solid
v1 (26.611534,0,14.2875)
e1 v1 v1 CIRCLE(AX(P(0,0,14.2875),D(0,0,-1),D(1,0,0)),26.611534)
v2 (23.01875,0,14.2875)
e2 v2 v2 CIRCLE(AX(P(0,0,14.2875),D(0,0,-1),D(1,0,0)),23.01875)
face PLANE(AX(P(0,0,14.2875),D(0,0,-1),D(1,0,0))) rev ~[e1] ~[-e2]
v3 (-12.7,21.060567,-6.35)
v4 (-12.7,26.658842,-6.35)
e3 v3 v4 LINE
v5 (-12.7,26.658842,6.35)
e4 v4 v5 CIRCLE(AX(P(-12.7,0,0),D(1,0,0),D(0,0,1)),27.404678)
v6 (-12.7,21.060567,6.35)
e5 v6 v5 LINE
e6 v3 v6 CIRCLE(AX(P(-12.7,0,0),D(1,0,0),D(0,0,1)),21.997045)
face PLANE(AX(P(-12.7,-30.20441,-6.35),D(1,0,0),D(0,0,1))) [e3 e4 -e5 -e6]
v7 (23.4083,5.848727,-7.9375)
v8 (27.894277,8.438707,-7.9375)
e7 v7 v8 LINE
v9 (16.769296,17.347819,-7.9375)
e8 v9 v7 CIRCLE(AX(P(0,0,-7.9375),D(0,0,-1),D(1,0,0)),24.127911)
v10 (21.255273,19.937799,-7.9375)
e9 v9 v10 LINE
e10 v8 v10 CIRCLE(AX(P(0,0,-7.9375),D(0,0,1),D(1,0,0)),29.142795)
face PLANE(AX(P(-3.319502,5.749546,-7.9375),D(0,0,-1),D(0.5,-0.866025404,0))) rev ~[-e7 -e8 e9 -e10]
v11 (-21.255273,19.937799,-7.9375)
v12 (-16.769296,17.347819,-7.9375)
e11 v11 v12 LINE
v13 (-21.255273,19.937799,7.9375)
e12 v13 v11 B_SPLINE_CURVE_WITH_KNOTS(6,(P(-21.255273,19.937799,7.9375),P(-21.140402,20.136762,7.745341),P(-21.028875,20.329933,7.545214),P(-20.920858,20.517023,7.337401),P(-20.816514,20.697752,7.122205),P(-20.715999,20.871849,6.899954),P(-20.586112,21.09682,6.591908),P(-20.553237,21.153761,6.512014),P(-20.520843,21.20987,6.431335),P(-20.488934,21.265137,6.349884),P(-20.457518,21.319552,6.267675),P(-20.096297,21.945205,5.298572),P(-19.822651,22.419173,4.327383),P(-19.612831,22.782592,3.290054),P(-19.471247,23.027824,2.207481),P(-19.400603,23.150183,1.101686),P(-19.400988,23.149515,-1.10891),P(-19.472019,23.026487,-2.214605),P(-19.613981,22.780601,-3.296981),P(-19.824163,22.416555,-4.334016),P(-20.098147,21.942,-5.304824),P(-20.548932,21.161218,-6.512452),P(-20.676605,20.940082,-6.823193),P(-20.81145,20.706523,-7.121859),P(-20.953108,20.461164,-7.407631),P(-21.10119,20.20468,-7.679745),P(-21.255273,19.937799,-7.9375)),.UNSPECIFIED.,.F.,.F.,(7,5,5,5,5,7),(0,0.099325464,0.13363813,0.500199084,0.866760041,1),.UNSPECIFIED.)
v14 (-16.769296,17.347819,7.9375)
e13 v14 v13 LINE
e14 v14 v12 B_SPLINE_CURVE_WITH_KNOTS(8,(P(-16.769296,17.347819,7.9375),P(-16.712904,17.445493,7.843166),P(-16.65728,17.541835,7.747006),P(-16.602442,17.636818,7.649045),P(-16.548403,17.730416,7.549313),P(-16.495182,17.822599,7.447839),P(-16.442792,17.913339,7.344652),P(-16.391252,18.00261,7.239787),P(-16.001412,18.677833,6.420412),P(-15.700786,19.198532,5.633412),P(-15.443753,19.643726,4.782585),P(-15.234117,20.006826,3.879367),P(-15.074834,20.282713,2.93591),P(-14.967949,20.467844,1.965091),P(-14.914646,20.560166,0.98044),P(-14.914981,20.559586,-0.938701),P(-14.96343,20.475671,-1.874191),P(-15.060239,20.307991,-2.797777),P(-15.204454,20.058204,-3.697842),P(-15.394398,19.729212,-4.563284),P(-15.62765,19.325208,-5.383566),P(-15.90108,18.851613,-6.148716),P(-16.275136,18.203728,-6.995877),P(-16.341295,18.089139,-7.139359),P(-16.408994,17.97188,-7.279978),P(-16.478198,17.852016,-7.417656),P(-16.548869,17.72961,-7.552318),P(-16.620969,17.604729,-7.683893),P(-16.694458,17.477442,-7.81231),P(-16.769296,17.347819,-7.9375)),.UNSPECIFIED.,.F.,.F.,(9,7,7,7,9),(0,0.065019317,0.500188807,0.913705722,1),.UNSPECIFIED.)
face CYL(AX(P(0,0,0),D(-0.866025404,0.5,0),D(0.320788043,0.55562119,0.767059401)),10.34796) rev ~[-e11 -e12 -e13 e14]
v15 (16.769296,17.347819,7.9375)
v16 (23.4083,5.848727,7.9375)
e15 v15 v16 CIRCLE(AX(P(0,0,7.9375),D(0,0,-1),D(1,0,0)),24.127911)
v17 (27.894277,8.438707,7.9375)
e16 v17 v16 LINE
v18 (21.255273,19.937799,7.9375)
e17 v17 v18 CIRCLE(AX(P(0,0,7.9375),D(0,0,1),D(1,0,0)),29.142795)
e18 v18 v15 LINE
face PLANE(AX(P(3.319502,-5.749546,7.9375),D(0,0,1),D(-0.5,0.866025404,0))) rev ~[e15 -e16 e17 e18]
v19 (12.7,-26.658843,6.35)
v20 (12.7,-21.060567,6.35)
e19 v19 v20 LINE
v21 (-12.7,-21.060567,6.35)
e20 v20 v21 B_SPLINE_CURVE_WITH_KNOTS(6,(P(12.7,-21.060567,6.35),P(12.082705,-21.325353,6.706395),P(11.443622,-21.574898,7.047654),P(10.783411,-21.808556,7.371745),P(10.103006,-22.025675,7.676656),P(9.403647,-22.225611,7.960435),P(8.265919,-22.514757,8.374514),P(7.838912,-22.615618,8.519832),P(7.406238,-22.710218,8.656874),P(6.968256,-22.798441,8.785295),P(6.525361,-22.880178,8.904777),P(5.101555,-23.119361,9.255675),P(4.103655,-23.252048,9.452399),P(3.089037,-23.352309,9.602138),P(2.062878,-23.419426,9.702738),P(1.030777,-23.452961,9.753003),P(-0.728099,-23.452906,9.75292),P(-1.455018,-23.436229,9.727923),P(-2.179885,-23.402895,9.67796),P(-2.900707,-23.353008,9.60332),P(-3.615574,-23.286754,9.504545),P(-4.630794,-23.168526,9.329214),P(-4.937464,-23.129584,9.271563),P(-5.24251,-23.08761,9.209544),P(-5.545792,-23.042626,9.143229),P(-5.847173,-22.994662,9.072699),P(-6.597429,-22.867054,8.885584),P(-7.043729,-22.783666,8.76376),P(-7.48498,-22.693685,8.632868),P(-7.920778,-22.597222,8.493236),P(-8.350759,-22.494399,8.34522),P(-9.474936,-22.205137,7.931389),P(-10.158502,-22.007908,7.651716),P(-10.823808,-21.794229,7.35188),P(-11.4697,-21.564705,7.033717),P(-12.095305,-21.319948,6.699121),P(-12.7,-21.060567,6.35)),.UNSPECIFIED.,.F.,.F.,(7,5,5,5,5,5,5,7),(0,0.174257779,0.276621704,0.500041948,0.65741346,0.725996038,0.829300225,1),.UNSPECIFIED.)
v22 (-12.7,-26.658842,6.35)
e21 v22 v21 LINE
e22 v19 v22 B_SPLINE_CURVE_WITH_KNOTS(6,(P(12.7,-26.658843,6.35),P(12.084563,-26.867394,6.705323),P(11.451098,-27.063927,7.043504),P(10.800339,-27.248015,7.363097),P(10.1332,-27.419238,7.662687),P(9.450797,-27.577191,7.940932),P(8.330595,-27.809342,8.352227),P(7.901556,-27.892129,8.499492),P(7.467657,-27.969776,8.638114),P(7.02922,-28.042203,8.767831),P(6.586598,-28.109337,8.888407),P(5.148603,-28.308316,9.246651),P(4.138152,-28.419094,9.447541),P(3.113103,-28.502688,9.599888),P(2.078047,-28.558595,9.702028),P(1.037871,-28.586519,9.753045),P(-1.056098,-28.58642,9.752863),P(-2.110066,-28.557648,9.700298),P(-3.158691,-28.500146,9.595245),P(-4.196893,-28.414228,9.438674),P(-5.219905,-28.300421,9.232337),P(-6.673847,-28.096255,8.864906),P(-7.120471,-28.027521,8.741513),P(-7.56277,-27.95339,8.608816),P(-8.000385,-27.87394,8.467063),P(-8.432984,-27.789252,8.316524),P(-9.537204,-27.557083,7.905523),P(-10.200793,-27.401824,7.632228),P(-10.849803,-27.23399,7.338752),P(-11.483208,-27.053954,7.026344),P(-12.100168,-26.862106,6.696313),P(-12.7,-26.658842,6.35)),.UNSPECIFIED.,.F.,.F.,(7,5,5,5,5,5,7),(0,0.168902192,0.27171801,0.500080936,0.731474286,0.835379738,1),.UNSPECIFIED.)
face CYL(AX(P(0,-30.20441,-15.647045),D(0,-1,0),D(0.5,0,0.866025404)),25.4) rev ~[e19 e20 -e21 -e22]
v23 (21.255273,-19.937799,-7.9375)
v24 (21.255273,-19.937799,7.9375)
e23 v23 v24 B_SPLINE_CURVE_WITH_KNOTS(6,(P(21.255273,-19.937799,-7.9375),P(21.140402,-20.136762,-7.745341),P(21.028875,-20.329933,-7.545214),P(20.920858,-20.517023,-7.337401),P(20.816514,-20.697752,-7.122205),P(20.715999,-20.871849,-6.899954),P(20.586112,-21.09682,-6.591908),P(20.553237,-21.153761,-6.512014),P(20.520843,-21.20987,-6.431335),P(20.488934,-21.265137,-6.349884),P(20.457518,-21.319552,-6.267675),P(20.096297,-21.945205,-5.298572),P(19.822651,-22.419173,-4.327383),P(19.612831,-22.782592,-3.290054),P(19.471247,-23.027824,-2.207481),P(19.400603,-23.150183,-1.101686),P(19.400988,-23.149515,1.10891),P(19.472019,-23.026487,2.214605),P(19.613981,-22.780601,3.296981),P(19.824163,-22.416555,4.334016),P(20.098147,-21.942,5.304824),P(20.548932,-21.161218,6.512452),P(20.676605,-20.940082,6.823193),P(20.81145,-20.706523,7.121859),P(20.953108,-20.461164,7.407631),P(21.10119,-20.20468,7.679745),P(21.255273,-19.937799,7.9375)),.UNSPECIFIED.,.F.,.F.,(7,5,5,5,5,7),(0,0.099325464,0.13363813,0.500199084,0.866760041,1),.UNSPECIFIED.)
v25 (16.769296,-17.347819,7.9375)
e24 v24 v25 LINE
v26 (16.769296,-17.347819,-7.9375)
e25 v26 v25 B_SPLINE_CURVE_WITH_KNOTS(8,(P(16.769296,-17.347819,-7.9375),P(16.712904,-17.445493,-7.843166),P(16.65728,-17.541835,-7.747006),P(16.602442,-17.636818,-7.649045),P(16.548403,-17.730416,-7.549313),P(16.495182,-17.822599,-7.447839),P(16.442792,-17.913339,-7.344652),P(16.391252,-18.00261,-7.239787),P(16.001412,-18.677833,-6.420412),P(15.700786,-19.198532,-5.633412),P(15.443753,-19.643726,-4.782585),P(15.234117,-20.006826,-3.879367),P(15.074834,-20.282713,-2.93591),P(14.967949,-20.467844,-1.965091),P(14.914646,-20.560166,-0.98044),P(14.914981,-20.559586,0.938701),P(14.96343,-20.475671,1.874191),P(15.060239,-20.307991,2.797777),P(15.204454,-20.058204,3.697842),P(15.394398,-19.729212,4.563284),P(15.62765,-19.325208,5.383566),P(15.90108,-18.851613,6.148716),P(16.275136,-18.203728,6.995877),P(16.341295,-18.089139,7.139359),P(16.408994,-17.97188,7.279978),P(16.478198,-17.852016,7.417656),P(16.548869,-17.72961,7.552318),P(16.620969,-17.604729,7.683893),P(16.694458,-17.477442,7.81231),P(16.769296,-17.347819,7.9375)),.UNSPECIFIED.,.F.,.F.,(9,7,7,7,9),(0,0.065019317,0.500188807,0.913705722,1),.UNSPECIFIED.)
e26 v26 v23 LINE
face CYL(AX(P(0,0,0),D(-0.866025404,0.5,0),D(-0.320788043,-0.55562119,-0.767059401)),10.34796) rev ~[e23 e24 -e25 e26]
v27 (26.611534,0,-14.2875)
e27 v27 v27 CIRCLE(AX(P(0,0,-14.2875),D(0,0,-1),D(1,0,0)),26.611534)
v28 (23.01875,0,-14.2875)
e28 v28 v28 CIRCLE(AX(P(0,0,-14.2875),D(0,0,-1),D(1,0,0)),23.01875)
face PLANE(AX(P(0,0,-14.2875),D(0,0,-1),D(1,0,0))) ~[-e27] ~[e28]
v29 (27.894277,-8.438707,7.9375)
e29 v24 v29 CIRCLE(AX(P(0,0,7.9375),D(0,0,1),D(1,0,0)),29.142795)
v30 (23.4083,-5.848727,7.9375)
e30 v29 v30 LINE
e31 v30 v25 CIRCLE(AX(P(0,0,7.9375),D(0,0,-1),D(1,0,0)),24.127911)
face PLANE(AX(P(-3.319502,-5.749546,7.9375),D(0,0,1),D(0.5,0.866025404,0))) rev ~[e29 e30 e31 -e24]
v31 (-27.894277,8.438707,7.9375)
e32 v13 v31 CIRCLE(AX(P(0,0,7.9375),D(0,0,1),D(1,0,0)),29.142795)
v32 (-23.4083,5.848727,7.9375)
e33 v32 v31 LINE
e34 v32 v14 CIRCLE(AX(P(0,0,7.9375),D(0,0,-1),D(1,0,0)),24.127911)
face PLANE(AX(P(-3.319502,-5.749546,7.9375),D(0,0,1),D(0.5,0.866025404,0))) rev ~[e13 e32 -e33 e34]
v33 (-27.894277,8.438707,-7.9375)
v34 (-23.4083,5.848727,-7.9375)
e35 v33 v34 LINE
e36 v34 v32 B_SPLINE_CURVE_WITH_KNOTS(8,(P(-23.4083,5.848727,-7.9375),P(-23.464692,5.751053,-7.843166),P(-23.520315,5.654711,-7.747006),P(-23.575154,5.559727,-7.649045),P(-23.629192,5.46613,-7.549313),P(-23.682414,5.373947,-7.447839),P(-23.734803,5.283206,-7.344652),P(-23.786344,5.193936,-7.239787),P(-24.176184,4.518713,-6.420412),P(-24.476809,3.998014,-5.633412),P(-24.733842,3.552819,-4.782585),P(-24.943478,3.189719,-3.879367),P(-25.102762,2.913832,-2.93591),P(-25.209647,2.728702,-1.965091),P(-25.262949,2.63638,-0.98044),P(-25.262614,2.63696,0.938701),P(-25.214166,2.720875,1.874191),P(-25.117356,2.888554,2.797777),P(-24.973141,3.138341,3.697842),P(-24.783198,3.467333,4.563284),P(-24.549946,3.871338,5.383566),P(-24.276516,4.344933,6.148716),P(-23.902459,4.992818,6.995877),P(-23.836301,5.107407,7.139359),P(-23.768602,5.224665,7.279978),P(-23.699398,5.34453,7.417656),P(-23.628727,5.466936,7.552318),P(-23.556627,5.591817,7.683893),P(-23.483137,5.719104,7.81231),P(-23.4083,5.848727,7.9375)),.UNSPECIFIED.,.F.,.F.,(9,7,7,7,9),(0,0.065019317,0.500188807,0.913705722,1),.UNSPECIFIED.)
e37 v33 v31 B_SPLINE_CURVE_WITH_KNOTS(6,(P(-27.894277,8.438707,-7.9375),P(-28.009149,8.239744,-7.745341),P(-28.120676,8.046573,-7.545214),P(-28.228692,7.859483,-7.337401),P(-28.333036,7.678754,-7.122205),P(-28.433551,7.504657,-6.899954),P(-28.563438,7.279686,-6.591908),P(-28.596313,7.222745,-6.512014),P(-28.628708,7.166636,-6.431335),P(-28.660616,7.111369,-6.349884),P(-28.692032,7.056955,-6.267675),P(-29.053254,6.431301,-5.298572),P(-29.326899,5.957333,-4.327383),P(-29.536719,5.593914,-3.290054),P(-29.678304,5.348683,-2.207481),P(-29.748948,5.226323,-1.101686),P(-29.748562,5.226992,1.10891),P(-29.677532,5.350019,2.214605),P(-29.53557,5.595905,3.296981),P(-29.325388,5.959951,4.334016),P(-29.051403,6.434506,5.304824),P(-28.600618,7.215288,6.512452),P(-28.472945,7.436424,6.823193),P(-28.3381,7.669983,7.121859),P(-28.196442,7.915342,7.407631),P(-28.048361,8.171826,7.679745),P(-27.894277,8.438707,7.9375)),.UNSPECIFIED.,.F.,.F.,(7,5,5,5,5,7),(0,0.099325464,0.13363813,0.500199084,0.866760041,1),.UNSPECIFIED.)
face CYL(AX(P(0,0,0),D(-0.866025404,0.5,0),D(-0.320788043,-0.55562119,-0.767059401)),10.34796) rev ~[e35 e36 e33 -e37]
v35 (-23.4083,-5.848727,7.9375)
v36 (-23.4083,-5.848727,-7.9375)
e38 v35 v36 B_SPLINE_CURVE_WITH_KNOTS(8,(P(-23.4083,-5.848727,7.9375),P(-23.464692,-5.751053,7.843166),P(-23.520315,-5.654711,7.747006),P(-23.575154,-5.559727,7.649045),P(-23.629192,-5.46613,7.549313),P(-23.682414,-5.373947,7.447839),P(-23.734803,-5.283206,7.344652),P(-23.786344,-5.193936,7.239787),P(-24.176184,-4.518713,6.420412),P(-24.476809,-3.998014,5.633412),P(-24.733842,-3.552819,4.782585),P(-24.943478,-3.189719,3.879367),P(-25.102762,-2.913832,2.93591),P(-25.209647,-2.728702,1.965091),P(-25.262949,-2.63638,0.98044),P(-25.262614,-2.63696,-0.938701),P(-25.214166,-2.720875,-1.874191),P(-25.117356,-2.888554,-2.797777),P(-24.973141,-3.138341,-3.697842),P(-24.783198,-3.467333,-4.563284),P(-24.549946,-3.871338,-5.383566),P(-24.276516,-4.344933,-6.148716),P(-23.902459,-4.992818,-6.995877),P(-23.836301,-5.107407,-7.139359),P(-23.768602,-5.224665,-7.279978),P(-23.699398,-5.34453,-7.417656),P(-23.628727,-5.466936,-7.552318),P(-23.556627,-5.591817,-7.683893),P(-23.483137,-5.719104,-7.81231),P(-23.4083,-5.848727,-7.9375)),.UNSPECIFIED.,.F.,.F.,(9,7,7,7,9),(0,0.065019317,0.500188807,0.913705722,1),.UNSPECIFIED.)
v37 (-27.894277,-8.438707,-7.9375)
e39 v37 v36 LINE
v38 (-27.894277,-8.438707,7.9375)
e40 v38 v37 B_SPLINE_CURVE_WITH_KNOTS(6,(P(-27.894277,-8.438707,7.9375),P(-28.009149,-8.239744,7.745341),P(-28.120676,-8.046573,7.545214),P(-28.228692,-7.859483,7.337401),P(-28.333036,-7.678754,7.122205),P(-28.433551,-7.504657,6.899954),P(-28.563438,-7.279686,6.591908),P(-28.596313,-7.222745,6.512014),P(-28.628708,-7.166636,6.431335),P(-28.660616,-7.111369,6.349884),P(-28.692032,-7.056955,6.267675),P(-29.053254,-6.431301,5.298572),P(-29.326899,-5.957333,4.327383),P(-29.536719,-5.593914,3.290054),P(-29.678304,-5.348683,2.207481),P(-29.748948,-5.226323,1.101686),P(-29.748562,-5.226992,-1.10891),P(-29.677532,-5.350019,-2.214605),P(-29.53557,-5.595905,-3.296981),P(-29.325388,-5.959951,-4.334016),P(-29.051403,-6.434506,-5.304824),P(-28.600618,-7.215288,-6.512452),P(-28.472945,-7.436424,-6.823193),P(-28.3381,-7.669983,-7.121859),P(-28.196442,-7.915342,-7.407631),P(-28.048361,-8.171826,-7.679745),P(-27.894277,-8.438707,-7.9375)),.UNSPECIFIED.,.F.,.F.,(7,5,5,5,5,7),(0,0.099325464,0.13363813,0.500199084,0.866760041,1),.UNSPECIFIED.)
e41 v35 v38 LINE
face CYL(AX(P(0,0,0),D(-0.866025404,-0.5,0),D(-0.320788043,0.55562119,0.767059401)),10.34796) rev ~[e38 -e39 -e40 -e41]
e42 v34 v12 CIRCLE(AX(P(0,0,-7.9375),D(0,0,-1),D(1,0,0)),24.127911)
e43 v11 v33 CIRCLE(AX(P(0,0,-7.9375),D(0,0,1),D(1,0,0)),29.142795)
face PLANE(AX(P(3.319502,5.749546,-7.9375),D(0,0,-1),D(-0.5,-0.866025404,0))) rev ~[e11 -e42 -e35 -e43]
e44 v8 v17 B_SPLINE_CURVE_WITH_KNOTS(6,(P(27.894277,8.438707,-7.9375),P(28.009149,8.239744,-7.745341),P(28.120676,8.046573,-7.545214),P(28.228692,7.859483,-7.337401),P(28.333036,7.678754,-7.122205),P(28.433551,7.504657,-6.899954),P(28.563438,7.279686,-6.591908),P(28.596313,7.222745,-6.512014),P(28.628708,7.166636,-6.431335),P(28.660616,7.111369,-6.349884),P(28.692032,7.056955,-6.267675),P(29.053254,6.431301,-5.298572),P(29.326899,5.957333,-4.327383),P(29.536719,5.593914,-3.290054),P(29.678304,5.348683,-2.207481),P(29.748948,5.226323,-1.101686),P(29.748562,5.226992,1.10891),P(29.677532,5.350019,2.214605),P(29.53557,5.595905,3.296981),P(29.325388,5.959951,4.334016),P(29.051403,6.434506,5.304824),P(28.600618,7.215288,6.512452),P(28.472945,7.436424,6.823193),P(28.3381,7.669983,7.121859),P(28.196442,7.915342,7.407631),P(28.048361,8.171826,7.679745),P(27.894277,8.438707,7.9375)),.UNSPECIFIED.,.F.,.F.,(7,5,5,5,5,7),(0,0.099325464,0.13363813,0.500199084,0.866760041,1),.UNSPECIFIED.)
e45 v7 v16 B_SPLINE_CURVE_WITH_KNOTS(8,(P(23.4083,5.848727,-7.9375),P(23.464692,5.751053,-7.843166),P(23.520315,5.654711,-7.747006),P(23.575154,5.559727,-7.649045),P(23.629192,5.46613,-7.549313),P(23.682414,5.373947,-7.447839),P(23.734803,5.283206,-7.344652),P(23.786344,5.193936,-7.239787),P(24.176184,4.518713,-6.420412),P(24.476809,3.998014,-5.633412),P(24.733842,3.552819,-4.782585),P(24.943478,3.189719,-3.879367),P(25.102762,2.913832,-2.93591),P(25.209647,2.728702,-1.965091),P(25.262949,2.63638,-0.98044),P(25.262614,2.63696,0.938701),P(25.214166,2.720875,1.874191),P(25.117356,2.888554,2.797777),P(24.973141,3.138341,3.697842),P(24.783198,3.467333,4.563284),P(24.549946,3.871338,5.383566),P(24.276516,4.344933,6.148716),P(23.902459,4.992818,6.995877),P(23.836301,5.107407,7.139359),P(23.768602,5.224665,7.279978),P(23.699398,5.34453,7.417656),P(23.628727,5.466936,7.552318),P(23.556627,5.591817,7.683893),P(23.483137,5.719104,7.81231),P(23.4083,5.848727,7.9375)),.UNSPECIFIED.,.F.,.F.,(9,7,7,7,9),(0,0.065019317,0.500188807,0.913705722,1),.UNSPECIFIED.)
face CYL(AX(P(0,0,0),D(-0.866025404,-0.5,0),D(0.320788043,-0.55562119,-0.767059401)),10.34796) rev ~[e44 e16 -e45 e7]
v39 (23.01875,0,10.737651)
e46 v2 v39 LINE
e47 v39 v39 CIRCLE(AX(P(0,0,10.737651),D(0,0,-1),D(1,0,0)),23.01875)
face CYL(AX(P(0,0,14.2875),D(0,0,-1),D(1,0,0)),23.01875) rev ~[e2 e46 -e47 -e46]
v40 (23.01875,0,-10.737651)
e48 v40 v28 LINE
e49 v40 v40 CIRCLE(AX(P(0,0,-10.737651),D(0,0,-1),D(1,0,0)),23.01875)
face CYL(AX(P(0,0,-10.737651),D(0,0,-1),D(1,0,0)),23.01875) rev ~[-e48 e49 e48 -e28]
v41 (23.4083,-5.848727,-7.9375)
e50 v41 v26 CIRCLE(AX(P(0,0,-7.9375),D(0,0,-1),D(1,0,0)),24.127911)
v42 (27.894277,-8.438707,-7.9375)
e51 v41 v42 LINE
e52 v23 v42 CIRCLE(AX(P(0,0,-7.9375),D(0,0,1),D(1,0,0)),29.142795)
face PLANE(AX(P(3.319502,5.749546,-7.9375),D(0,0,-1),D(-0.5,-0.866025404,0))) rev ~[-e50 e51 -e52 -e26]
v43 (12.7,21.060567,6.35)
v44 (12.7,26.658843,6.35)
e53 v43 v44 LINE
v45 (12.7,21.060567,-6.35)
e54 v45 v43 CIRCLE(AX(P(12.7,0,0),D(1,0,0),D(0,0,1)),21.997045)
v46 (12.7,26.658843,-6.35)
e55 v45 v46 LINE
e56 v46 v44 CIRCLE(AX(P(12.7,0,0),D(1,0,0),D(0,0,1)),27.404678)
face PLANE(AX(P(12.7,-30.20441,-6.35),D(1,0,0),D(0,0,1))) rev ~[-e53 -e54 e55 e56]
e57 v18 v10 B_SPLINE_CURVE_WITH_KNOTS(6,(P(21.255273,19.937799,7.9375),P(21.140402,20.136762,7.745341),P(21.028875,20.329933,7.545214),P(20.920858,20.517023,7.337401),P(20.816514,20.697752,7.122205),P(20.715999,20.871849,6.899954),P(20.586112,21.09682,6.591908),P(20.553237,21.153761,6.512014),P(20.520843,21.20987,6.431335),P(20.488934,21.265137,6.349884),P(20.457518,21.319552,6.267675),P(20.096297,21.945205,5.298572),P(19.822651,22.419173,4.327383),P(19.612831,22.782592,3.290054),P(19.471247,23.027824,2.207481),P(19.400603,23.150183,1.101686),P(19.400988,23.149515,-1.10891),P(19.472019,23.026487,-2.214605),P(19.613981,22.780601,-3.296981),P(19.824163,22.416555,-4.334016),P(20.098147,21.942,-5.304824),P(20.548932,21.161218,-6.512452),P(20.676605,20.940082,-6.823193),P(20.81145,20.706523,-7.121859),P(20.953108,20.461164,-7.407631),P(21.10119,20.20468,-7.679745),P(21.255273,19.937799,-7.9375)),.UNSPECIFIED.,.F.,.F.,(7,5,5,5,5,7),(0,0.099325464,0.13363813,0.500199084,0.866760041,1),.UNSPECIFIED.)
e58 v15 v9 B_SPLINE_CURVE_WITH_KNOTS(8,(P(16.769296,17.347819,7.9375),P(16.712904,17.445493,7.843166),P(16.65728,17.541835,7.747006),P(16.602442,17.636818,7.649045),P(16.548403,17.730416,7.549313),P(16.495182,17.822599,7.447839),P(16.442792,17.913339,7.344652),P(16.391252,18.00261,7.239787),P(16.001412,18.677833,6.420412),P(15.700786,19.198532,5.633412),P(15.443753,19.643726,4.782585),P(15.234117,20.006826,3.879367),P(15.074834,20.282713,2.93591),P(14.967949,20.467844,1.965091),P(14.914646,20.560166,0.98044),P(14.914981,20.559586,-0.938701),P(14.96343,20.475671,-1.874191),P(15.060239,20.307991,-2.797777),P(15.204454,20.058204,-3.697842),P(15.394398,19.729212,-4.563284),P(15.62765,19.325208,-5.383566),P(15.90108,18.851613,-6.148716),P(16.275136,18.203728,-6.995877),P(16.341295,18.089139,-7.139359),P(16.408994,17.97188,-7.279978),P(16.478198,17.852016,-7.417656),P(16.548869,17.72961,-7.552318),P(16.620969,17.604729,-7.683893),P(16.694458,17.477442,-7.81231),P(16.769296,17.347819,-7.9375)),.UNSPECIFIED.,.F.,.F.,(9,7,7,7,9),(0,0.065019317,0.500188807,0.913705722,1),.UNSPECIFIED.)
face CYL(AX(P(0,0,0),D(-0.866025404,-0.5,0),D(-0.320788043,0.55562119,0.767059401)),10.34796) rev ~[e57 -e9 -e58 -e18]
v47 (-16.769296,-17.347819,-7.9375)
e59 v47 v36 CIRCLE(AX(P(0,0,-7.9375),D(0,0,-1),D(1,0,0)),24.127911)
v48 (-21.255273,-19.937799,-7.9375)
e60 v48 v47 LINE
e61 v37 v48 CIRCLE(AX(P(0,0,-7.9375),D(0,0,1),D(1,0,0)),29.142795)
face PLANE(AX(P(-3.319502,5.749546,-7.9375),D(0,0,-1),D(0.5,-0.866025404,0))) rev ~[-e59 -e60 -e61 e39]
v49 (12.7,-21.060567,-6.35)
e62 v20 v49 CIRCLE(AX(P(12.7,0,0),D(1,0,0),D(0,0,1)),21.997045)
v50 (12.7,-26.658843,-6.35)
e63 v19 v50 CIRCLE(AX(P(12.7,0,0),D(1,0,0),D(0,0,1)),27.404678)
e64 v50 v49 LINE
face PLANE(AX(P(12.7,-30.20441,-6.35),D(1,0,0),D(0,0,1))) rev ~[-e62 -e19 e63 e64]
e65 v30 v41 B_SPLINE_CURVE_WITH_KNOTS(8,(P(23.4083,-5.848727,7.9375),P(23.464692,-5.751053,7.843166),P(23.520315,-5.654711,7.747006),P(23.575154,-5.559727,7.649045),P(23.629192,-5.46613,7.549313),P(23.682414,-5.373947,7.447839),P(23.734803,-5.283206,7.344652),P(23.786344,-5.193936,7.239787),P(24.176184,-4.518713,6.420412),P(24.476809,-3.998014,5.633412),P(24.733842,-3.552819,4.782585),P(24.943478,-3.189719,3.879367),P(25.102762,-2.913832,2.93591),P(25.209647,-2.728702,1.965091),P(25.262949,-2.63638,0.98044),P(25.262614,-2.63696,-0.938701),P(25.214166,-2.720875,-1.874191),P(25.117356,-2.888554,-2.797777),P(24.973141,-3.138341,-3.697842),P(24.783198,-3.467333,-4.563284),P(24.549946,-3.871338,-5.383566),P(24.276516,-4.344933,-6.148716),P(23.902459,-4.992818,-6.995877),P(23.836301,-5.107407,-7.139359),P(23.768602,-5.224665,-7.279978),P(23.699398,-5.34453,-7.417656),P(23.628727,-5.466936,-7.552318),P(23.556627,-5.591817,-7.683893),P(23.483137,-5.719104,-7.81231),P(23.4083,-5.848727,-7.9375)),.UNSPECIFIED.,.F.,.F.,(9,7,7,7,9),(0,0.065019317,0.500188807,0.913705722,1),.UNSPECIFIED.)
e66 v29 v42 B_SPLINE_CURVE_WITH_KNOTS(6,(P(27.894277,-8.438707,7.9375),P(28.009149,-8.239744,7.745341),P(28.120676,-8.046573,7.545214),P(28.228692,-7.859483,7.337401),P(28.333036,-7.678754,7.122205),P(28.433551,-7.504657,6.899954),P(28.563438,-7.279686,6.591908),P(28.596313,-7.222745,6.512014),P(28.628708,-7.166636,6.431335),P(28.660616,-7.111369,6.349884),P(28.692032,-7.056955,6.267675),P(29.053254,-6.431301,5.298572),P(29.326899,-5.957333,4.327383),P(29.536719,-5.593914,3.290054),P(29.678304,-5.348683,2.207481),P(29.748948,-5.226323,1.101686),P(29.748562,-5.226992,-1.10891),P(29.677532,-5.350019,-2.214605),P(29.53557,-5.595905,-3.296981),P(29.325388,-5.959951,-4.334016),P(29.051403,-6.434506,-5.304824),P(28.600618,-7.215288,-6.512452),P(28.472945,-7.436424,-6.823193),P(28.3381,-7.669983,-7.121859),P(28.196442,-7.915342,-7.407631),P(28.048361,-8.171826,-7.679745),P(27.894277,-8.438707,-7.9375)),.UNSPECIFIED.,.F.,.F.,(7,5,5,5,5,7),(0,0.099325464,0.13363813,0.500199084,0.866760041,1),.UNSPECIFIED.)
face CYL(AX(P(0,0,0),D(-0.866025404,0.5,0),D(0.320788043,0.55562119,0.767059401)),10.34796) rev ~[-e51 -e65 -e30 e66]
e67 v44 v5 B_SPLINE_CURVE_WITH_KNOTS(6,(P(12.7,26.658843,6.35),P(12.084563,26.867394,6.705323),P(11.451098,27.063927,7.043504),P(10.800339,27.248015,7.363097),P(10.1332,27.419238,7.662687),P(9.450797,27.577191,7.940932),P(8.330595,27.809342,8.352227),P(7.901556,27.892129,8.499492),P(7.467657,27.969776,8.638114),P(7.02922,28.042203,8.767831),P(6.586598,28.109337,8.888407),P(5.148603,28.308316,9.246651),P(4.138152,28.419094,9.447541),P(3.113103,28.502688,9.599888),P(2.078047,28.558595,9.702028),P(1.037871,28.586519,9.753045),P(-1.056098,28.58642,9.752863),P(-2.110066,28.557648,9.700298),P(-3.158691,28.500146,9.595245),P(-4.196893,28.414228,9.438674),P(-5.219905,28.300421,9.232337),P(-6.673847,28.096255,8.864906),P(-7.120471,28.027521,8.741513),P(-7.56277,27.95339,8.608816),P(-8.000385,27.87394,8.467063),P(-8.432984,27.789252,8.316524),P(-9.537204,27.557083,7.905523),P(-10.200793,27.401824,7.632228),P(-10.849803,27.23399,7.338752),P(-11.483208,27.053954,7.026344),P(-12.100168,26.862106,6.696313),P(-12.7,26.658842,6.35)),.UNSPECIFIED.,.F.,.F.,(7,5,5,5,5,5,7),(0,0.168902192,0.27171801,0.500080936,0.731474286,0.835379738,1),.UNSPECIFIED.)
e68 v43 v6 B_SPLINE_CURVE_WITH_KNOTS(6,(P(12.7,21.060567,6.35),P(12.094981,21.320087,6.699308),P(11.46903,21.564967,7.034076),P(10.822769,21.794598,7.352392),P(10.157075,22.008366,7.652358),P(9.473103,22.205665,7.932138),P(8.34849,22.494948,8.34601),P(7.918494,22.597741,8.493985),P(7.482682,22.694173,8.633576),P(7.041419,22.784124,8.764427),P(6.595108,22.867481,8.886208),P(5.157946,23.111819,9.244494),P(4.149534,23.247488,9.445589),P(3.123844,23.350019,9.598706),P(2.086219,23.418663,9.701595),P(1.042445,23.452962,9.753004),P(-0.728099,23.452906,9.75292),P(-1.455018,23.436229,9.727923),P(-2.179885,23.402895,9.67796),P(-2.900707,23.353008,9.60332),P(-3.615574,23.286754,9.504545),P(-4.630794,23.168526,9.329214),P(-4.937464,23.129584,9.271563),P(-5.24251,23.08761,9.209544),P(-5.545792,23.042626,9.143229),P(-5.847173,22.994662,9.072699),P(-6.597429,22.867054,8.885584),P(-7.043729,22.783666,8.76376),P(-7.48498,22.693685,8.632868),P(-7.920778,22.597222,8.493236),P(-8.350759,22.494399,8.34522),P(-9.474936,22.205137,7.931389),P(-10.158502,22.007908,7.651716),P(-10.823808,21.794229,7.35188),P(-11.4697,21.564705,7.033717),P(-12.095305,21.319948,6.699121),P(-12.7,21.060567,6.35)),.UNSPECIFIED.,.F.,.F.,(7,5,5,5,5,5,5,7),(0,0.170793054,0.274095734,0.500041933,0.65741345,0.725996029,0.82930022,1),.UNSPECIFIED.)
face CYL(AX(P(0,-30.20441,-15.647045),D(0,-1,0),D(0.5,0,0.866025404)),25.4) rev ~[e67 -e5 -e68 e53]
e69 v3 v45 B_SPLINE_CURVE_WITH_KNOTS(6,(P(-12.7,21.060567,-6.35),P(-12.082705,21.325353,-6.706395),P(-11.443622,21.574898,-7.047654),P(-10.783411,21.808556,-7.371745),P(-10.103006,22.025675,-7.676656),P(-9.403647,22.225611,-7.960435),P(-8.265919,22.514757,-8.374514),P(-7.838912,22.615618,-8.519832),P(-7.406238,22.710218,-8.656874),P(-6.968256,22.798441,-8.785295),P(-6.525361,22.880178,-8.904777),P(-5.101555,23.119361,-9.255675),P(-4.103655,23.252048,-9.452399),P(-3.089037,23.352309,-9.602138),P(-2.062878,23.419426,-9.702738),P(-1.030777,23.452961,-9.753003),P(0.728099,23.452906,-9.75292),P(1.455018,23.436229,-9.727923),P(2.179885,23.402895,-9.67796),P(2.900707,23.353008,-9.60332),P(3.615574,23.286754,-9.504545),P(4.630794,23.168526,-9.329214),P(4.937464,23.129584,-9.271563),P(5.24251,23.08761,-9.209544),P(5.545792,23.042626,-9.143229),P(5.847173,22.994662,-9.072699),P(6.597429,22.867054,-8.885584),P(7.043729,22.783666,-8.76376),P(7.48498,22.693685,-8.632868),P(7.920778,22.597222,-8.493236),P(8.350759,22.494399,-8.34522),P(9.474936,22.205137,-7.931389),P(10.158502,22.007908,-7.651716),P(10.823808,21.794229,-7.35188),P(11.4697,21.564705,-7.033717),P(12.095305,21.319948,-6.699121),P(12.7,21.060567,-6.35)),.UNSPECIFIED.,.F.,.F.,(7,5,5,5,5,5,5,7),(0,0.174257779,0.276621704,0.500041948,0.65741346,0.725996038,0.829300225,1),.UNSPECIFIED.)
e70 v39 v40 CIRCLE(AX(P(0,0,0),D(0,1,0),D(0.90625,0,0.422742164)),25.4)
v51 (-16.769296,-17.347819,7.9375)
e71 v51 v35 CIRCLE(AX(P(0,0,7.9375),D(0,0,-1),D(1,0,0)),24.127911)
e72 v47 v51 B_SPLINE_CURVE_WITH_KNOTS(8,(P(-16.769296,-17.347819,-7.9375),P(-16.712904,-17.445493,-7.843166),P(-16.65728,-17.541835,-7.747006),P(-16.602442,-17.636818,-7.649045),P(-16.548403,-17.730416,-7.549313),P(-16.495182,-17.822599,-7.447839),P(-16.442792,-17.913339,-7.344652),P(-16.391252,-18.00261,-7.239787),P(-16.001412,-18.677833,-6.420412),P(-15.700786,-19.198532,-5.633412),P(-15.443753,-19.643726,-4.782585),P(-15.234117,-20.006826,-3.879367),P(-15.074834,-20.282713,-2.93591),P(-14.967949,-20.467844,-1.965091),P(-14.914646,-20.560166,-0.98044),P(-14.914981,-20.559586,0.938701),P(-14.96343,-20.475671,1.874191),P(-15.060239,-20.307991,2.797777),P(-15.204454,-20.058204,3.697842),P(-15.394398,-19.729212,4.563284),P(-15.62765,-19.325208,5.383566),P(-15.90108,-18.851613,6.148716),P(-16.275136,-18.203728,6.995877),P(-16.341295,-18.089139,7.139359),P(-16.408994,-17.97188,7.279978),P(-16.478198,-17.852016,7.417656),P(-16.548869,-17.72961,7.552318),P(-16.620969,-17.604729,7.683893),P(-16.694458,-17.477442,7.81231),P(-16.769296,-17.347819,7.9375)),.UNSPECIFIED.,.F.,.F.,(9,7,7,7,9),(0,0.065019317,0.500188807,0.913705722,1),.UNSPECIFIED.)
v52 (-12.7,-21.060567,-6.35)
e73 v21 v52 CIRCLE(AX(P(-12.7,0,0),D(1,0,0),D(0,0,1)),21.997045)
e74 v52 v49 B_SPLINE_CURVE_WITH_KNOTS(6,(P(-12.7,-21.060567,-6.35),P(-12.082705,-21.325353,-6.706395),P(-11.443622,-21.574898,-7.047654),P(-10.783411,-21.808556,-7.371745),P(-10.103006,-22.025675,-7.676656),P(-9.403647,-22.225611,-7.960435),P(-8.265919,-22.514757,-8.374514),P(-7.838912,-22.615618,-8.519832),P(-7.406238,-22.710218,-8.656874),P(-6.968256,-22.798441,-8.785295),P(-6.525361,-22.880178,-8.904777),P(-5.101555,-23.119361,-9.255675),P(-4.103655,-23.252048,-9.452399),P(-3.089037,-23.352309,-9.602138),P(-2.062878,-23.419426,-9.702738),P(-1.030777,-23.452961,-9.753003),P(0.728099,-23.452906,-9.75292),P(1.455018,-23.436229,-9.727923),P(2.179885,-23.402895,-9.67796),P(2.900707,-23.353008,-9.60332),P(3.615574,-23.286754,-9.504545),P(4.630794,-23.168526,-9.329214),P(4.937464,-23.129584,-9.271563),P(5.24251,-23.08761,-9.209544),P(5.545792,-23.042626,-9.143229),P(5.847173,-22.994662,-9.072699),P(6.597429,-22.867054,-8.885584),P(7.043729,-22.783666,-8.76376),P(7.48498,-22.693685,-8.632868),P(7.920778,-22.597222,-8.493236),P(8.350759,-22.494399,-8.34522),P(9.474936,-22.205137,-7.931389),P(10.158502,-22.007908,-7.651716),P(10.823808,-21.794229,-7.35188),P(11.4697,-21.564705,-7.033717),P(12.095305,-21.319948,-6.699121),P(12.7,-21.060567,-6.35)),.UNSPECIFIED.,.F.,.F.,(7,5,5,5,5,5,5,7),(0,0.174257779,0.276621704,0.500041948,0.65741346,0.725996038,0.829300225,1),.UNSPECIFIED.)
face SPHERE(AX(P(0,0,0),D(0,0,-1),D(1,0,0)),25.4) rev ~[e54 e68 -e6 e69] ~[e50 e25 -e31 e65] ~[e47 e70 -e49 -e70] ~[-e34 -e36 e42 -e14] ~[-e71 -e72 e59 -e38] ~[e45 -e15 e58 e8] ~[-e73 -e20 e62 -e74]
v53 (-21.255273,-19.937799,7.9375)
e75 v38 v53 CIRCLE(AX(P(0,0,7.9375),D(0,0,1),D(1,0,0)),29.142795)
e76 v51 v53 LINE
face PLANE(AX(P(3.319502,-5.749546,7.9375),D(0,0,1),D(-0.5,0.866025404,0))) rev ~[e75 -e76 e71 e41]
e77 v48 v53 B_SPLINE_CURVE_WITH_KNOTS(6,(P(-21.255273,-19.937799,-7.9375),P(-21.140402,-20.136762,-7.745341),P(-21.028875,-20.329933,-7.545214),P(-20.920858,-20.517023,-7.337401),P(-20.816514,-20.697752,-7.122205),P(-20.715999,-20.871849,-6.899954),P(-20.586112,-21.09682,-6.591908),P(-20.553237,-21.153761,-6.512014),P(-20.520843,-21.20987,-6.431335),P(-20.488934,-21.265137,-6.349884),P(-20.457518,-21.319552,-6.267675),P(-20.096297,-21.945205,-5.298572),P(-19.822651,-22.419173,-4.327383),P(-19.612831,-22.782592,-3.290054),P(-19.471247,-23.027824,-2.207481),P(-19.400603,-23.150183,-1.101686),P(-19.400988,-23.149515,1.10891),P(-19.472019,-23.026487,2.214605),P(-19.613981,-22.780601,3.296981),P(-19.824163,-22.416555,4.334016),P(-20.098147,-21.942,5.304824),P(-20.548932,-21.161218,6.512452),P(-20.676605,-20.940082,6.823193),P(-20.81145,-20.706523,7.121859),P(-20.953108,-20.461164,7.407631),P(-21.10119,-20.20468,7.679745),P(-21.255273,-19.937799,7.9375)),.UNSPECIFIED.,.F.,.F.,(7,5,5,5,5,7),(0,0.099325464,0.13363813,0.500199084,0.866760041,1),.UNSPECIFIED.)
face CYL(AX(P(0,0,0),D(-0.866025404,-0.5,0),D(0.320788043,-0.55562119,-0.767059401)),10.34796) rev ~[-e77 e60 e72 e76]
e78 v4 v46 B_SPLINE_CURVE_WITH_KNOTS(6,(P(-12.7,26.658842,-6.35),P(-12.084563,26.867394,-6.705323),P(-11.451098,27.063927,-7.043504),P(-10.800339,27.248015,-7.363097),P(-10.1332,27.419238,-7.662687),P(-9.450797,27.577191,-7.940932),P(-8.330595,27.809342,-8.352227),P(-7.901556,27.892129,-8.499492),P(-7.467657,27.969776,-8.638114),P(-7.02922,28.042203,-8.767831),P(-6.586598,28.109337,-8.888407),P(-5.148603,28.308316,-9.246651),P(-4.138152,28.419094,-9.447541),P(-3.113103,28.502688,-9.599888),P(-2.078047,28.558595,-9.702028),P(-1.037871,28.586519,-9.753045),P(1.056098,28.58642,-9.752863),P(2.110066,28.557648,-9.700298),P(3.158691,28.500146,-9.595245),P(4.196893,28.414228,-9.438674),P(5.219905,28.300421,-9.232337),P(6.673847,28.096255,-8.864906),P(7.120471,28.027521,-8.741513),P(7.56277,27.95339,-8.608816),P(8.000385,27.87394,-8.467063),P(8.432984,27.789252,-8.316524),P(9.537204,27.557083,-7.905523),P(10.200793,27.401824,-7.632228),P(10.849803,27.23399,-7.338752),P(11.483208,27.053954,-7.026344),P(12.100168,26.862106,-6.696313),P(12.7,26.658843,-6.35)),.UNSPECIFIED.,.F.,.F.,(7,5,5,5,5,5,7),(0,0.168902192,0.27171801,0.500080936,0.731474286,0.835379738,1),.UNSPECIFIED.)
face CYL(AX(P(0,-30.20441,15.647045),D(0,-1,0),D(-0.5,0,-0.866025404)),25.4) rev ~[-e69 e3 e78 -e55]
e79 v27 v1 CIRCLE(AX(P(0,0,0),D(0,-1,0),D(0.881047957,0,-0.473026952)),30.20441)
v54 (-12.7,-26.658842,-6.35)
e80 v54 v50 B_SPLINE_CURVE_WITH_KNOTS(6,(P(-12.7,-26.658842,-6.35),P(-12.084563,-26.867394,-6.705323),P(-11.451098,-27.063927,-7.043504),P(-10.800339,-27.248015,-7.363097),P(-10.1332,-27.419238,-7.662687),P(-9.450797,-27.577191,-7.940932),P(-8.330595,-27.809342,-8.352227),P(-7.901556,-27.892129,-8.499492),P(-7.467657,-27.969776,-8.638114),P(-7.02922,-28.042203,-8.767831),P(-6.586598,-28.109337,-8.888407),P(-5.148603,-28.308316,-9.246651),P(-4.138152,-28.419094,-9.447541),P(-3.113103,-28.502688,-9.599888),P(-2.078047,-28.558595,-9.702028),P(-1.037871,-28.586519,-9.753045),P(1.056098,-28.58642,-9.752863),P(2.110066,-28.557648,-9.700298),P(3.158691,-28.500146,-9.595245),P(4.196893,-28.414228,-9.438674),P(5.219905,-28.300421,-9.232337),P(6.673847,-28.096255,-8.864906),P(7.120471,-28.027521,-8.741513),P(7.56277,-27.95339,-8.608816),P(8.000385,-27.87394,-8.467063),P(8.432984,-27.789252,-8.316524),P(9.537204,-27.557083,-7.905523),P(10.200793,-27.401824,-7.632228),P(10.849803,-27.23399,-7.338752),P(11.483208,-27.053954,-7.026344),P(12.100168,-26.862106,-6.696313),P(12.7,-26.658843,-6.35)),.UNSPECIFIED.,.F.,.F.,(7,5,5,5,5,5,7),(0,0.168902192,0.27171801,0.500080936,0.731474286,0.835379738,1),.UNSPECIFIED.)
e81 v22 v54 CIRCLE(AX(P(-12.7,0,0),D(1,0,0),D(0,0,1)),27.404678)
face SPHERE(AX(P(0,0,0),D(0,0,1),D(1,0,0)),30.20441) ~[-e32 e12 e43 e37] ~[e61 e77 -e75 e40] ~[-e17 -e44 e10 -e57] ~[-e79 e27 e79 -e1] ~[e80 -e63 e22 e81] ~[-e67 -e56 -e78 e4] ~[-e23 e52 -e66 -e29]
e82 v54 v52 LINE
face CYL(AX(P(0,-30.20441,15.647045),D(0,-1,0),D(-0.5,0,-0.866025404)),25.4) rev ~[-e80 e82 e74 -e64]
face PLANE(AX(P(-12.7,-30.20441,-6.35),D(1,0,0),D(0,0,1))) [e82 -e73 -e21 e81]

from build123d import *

# Parameters (mm, degrees)
F3_W      = 25.4
F3_H      = 12.7
F4_DEPTH  = 72.39
F7_DEPTH  = 53.086
F10_DEPTH = 47.244


# Not quite as in the source:
# - a feature names something its author has since deleted; it is built from what else it names


with BuildPart() as f1:
    # F0 (on Front) → F1 (revolve)
    with BuildSketch(Plane.XZ):
        with BuildLine():
            ThreePointArc((23.01875, 10.7376509739), (25.4, 0), (23.01875, -10.7376509739))
            Line((23.01875, -10.7376509739), (23.01875, -14.2875))
            Line((23.01875, -14.2875), (26.611533725, -14.2875))
            ThreePointArc((26.611533725, -14.2875), (30.20441, 0), (26.611533725, 14.2875))
            Line((26.611533725, 14.2875), (23.01875, 14.2875))
            Line((23.01875, 14.2875), (23.01875, 10.7376509739))
        make_face()
    revolve(axis=Axis((0, 0, -4.5421977431), (0, 0, -1)))

    # F3 (on offset) → F4 (cut)
    with BuildSketch(Plane.XZ.offset(30.20441)):
        with BuildLine():
            ThreePointArc((12.7, 6.35), (0, 9.7529547439), (-12.7, 6.35))
            Line((-12.7, 6.35), (12.7, 6.35))
        make_face()
        Rectangle(F3_W, F3_H)
        with BuildLine():
            Line((12.7, -6.35), (-12.7, -6.35))
            ThreePointArc((-12.7, -6.35), (0, -9.7529547439), (12.7, -6.35))
        make_face()
    extrude(amount=-F4_DEPTH, mode=Mode.SUBTRACT)

    # F6 (on line) → F7 (cut, symmetric)
    with BuildSketch(Plane(origin=(0, 0, 0), x_dir=(0.5, -0.8660254038, 0), z_dir=(-0.8660254038, -0.5, 0))):
        with BuildLine():
            ThreePointArc((6.6390036837, -7.9375), (10.34796, 0), (6.6390036837, 7.9375))
            Line((6.6390036837, 7.9375), (-6.6390036837, 7.9375))
            ThreePointArc((-6.6390036837, 7.9375), (-10.34796, 0), (-6.6390036837, -7.9375))
            Line((-6.6390036837, -7.9375), (6.6390036837, -7.9375))
        make_face()
    extrude(amount=F7_DEPTH, both=True, mode=Mode.SUBTRACT)

    # F9 (on line) → F10 (cut, symmetric)
    with BuildSketch(Plane(origin=(0, 0, 0), x_dir=(-0.5, -0.8660254038, 0), z_dir=(-0.8660254038, 0.5, 0))):
        with BuildLine():
            ThreePointArc((6.6390036837, -7.9375), (10.34796, 0), (6.6390036837, 7.9375))
            Line((6.6390036837, 7.9375), (-6.6390036837, 7.9375))
            ThreePointArc((-6.6390036837, 7.9375), (-10.34796, 0), (-6.6390036837, -7.9375))
            Line((-6.6390036837, -7.9375), (6.6390036837, -7.9375))
        make_face()
    extrude(amount=F10_DEPTH, both=True, mode=Mode.SUBTRACT)


solid = f1.part
